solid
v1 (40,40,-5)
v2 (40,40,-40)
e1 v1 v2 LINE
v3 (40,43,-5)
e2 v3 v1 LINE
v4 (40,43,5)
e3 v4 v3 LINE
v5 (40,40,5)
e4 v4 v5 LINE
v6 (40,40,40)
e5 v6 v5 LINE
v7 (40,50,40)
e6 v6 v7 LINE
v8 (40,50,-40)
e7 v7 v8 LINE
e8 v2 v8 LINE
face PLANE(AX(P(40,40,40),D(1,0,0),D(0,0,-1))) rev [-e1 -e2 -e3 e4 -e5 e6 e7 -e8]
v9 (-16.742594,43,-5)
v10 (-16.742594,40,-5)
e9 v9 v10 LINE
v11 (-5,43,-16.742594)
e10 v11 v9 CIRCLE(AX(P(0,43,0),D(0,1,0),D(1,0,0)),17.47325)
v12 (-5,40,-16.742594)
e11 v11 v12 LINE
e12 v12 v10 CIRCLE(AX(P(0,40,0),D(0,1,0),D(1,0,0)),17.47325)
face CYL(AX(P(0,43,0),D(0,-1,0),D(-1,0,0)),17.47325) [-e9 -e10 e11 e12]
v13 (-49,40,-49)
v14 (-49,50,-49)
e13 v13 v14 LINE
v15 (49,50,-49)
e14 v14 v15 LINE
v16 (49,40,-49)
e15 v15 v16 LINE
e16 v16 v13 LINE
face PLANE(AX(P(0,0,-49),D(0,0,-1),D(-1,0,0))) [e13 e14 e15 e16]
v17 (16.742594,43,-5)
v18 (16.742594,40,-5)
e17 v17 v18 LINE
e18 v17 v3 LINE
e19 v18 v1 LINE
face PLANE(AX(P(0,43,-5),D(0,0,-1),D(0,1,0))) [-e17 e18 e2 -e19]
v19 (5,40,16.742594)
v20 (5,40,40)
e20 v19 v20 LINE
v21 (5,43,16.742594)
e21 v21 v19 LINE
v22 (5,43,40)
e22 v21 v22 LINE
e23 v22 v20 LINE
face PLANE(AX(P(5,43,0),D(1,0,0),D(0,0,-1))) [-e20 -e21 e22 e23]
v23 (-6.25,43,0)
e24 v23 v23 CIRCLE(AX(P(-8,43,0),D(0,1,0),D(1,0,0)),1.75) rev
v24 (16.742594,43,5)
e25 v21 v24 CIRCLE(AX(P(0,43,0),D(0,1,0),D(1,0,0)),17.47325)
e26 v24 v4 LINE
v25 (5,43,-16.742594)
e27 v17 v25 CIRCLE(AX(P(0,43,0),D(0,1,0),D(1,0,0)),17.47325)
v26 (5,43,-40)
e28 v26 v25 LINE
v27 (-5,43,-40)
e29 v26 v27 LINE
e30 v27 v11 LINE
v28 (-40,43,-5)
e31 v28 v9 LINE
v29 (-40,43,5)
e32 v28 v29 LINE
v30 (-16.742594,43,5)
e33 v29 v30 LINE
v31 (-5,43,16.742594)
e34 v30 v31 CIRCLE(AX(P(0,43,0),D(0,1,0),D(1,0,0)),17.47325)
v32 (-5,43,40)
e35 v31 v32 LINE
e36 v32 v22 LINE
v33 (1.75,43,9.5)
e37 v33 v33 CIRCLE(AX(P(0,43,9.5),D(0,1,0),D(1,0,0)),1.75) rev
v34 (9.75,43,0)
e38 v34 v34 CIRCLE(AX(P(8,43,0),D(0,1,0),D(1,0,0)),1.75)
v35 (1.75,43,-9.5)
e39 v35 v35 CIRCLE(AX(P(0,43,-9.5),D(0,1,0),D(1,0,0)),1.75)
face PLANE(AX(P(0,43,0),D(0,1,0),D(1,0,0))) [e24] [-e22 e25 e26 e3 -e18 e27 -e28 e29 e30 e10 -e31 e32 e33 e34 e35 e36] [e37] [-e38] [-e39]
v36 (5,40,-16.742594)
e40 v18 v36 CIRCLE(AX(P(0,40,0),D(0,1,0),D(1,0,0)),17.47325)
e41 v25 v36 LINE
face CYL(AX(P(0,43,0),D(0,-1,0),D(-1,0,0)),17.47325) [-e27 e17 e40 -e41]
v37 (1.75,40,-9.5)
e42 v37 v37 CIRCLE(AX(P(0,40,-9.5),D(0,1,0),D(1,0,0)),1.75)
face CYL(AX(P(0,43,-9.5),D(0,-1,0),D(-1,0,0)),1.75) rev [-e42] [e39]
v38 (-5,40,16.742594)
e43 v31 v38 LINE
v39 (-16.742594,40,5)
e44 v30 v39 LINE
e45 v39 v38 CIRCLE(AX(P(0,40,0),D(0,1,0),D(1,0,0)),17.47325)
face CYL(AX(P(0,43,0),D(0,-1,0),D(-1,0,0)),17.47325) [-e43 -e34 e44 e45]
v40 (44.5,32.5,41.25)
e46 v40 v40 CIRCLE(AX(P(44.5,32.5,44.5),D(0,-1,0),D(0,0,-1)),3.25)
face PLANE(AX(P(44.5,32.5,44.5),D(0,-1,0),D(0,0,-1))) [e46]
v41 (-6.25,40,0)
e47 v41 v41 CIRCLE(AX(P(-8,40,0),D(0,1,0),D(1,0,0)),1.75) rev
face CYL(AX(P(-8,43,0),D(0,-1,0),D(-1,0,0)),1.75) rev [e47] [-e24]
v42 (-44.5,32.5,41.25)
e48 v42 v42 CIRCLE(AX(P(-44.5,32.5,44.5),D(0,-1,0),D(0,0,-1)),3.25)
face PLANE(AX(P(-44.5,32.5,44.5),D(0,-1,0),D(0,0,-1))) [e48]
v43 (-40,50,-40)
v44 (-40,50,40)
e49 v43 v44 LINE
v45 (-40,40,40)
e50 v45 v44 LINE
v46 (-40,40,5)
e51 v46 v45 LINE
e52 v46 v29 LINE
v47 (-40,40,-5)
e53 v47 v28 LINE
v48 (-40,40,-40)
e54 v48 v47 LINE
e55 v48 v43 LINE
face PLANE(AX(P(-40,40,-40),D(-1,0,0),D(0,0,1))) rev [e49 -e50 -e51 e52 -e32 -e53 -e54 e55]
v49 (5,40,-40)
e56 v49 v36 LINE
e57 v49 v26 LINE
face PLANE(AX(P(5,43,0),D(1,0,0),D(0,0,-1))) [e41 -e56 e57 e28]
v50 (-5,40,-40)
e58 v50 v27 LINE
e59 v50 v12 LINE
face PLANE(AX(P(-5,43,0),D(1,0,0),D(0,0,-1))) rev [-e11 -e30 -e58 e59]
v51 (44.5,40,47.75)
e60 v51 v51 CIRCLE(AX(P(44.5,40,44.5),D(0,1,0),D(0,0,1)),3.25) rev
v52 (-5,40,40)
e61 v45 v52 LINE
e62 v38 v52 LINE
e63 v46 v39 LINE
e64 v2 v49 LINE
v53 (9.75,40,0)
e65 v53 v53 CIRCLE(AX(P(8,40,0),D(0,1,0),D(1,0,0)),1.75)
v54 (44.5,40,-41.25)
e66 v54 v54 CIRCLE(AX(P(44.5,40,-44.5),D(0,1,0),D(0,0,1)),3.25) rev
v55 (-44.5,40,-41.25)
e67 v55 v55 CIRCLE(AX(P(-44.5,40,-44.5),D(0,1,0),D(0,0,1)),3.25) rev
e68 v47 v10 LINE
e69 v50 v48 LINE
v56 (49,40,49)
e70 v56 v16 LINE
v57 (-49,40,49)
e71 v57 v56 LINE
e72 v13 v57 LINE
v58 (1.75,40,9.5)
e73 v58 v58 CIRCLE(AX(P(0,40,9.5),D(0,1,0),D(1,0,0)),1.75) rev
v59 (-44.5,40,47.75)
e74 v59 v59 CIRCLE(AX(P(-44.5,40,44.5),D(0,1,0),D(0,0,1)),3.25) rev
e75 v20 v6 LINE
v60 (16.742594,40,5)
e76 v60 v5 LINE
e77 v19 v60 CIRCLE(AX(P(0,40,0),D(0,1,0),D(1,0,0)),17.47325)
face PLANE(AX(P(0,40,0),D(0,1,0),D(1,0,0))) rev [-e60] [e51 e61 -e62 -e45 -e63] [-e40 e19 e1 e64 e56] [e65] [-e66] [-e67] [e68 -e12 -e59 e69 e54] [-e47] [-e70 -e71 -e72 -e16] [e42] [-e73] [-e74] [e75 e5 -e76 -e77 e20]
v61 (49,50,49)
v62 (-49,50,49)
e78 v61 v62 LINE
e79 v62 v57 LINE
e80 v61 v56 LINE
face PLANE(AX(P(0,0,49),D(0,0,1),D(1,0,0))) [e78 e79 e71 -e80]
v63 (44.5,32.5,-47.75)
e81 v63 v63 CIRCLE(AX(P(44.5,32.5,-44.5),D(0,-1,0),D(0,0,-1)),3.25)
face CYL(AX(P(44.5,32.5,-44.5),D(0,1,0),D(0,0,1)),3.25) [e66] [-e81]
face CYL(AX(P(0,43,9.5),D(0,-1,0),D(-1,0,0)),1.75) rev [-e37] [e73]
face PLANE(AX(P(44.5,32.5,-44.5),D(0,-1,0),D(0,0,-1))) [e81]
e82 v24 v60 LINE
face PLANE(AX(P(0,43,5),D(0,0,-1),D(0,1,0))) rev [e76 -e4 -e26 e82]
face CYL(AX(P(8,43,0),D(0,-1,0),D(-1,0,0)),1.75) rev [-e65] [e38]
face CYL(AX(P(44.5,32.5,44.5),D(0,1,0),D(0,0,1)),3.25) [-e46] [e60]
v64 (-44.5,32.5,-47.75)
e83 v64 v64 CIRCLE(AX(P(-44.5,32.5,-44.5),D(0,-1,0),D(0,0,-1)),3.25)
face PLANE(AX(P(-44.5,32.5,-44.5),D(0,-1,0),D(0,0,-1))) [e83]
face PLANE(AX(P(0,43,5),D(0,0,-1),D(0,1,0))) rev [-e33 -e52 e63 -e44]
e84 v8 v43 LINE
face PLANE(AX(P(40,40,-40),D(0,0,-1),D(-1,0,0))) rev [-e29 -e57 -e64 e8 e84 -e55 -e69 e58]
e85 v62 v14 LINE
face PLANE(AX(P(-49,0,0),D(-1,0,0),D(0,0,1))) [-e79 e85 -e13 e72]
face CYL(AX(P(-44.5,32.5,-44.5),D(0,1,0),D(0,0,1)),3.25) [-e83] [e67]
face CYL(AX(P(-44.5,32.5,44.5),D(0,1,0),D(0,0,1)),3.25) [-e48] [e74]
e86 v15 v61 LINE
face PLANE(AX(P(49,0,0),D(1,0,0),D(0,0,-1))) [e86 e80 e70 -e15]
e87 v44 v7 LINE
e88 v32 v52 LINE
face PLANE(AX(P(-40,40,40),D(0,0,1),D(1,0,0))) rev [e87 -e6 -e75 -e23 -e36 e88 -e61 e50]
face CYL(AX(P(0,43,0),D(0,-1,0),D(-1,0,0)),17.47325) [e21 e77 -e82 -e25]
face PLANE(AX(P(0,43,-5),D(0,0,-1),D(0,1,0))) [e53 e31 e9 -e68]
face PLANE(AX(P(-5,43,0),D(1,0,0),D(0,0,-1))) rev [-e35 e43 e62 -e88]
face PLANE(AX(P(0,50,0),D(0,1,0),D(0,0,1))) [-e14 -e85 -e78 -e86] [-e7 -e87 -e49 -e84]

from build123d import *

# Parameters (mm, degrees)
SKETCH2_R                  = 1.75
SKETCH2_W                  = 10
SKETCH2_H                  = 10
BOSS_EXTRUDE1_DEPTH        = 3
CIRPATTERN1_COUNT          = 4
CIRPATTERN2_START          = 40
CIRPATTERN2_OUTLINE_R      = 1.75
CIRPATTERN2_DEPTH          = 3
CIRPATTERN2_START_2        = -43
CIRPATTERN2_2_OUTLINE_R    = 1.75
CIRPATTERN2_2_DEPTH        = 3
CIRPATTERN2_3_OUTLINE_R    = 1.75
CIRPATTERN2_3_DEPTH        = 3
CIRPATTERN2_4_OUTLINE_R    = 1.75
CIRPATTERN2_4_DEPTH        = 3
BOSS_EXTRUDE2_DEPTH        = 50
BOSS_EXTRUDE2_DEPTH_BACK   = 50
SKETCH3_W                  = 10
SKETCH3_H                  = 10
BOSS_EXTRUDE2_2_DEPTH      = 50
BOSS_EXTRUDE2_2_DEPTH_BACK = 50
BOSS_EXTRUDE2_3_DEPTH      = 50
BOSS_EXTRUDE2_3_DEPTH_BACK = 50
BOSS_EXTRUDE2_4_DEPTH      = 50
BOSS_EXTRUDE2_4_DEPTH_BACK = 50
SKETCH4_W                  = 100
SKETCH4_H                  = 100
SKETCH4_W_2                = 80
SKETCH4_H_2                = 80
BOSS_EXTRUDE3_DEPTH        = 10
SKETCH5_W                  = 100
SKETCH5_H                  = 100
SKETCH5_W_2                = 80
SKETCH5_H_2                = 80
BOSS_EXTRUDE4_DEPTH        = 10
SKETCH7_R                  = 3.75
CUT_EXTRUDE2_DEPTH         = 10
SKETCH8_R                  = 3.75
CUT_EXTRUDE3_DEPTH         = 117.828934772
SKETCH9_R                  = 3.75
CUT_EXTRUDE4_DEPTH         = 117.828934772
SKETCH10_W                 = 100
SKETCH10_H                 = 100
CUT_EXTRUDE5_DEPTH         = 3
SKETCH11_W                 = 100
SKETCH11_H                 = 97
CUT_EXTRUDE6_DEPTH         = 1
SKETCH12_W                 = 99
SKETCH12_H                 = 97
CUT_EXTRUDE7_DEPTH         = 1
SKETCH13_W                 = 99
SKETCH13_H                 = 97
CUT_EXTRUDE8_DEPTH         = 1
SKETCH14_W                 = 98
SKETCH14_H                 = 97
CUT_EXTRUDE9_DEPTH         = 1
SKETCH16_W                 = 98
SKETCH16_H                 = 98
CUT_EXTRUDE10_DEPTH        = 112.22499719
SKETCH17_R                 = 3.25
BOSS_EXTRUDE5_DEPTH        = 7.5


# Read off the part's stored shape, not the designer's step: CirPattern2
with BuildPart() as part:
    # Sketch2 → Boss-Extrude1 (new body)
    # profile 1 of 13: a face of its own
    with BuildSketch(Plane.XY.offset(40)):
        with BuildLine():
            ThreePointArc((5, -16.74259435), (0, -17.47325), (-5, -16.74259435))
            Line((-5, -16.74259435), (-5, -50))
            Line((-5, -50), (5, -50))
            Line((5, -50), (5, -16.74259435))
        make_face()
    # profile 2 of 13: a face of its own
    with BuildSketch(Plane.XY.offset(40)):
        with BuildLine():
            Line((5, -5), (-5, -5))
            Line((-5, -5), (-5, -16.74259435))
            ThreePointArc((-5, -16.74259435), (0, -17.47325), (5, -16.74259435))
            Line((5, -16.74259435), (5, -5))
        make_face()
        with Locations((0, -9.5)):
            Circle(SKETCH2_R, mode=Mode.SUBTRACT)
    # profile 3 of 13: a face of its own
    with BuildSketch(Plane.XY.offset(40)):
        with BuildLine():
            Line((16.74259435, -5), (5, -5))
            Line((5, -5), (5, -16.74259435))
            ThreePointArc((5, -16.74259435), (12.355453564, -12.355453564), (16.74259435, -5))
        make_face()
    # profile 4 of 13: a face of its own
    with BuildSketch(Plane.XY.offset(40)):
        with BuildLine():
            Line((5, 5), (5, -5))
            Line((5, -5), (16.74259435, -5))
            ThreePointArc((16.74259435, -5), (17.289621197, -2.526551883), (17.47325, 0))
            ThreePointArc((17.47325, 0), (17.289621197, 2.526551883), (16.74259435, 5))
            Line((16.74259435, 5), (5, 5))
        make_face()
        with Locations((8, 0)):
            Circle(SKETCH2_R, mode=Mode.SUBTRACT)
    # profile 5 of 13: a face of its own
    with BuildSketch(Plane.XY.offset(40)):
        Rectangle(SKETCH2_W, SKETCH2_H)
    # profile 6 of 13: a face of its own
    with BuildSketch(Plane.XY.offset(40)):
        with BuildLine():
            Line((-5, -5), (-16.74259435, -5))
            ThreePointArc((-16.74259435, -5), (-12.355453564, -12.355453564), (-5, -16.74259435))
            Line((-5, -16.74259435), (-5, -5))
        make_face()
    # profile 7 of 13: a face of its own
    with BuildSketch(Plane.XY.offset(40)):
        with BuildLine():
            ThreePointArc((-16.74259435, 5), (-17.47325, 0), (-16.74259435, -5))
            Line((-16.74259435, -5), (-5, -5))
            Line((-5, -5), (-5, 5))
            Line((-5, 5), (-16.74259435, 5))
        make_face()
        with Locations((-8, 0)):
            Circle(SKETCH2_R, mode=Mode.SUBTRACT)
    # profile 8 of 13: a face of its own
    with BuildSketch(Plane.XY.offset(40)):
        with BuildLine():
            ThreePointArc((-5, 16.74259435), (-12.355453564, 12.355453564), (-16.74259435, 5))
            Line((-16.74259435, 5), (-5, 5))
            Line((-5, 5), (-5, 16.74259435))
        make_face()
    # profile 9 of 13: a face of its own
    with BuildSketch(Plane.XY.offset(40)):
        with BuildLine():
            Line((-5, 16.74259435), (-5, 5))
            Line((-5, 5), (5, 5))
            Line((5, 5), (5, 16.74259435))
            ThreePointArc((5, 16.74259435), (0, 17.47325), (-5, 16.74259435))
        make_face()
        with Locations((0, 9.5)):
            Circle(SKETCH2_R, mode=Mode.SUBTRACT)
    # profile 10 of 13: a face of its own
    with BuildSketch(Plane.XY.offset(40)):
        with BuildLine():
            Line((5, 16.74259435), (5, 5))
            Line((5, 5), (16.74259435, 5))
            ThreePointArc((16.74259435, 5), (12.355453564, 12.355453564), (5, 16.74259435))
        make_face()
    # profile 11 of 13: a face of its own
    with BuildSketch(Plane.XY.offset(40)):
        with BuildLine():
            ThreePointArc((17.47325, 0), (17.289621197, -2.526551883), (16.74259435, -5))
            Line((16.74259435, -5), (50, -5))
            Line((50, -5), (50, 5))
            Line((50, 5), (16.74259435, 5))
            ThreePointArc((16.74259435, 5), (17.289621197, 2.526551883), (17.47325, 0))
        make_face()
    # profile 12 of 13: a face of its own
    with BuildSketch(Plane.XY.offset(40)):
        with BuildLine():
            Line((-50, 5), (-50, -5))
            Line((-50, -5), (-16.74259435, -5))
            ThreePointArc((-16.74259435, -5), (-17.47325, 0), (-16.74259435, 5))
            Line((-16.74259435, 5), (-50, 5))
        make_face()
    # profile 13 of 13: a face of its own
    with BuildSketch(Plane.XY.offset(40)):
        with BuildLine():
            Line((-5, 50), (-5, 16.74259435))
            ThreePointArc((-5, 16.74259435), (0, 17.47325), (5, 16.74259435))
            Line((5, 16.74259435), (5, 50))
            Line((5, 50), (-5, 50))
        make_face()
    extrude(amount=BOSS_EXTRUDE1_DEPTH)


with BuildPart() as cirpattern1_1:
    # CirPattern1: pattern copy
    add(part.part.rotate(Axis((0, 0, 0), (1, 0, 0)), 1 * 360 / CIRPATTERN1_COUNT))


with BuildPart() as cirpattern1_2:
    # CirPattern1: pattern copy
    add(part.part.rotate(Axis((0, 0, 0), (1, 0, 0)), 2 * 360 / CIRPATTERN1_COUNT))


with BuildPart() as cirpattern1_3:
    # CirPattern1: pattern copy
    add(part.part.rotate(Axis((0, 0, 0), (1, 0, 0)), 3 * 360 / CIRPATTERN1_COUNT))


with BuildPart() as body_5:
    # CirPattern2 outline → CirPattern2 (new body)
    with BuildSketch(Plane.XY.offset(CIRPATTERN2_START)):
        with BuildLine():
            ThreePointArc((5, -16.74259435), (12.355453564, -12.355453564), (16.74259435, -5))
            Line((16.74259435, -5), (50, -5))
            Line((50, -5), (50, 5))
            Line((50, 5), (16.74259435, 5))
            ThreePointArc((16.74259435, 5), (12.355453564, 12.355453564), (5, 16.74259435))
            Line((5, 16.74259435), (5, 50))
            Line((5, 50), (-5, 50))
            Line((-5, 50), (-5, 16.74259435))
            ThreePointArc((-5, 16.74259435), (-12.355453564, 12.355453564), (-16.74259435, 5))
            Line((-16.74259435, 5), (-50, 5))
            Line((-50, 5), (-50, -5))
            Line((-50, -5), (-16.74259435, -5))
            ThreePointArc((-16.74259435, -5), (-12.355453564, -12.355453564), (-5, -16.74259435))
            Line((-5, -16.74259435), (-5, -50))
            Line((-5, -50), (5, -50))
            Line((5, -50), (5, -16.74259435))
        make_face()
        with Locations((0, -9.5)):
            Circle(CIRPATTERN2_OUTLINE_R, mode=Mode.SUBTRACT)
        with Locations((-8, 0)):
            Circle(CIRPATTERN2_OUTLINE_R, mode=Mode.SUBTRACT)
        with Locations((8, 0)):
            Circle(CIRPATTERN2_OUTLINE_R, mode=Mode.SUBTRACT)
        with Locations((0, 9.5)):
            Circle(CIRPATTERN2_OUTLINE_R, mode=Mode.SUBTRACT)
    extrude(amount=CIRPATTERN2_DEPTH)


with BuildPart() as body_6:
    # CirPattern2 2 outline → CirPattern2 2 (new body)
    with BuildSketch(Plane.YZ.offset(CIRPATTERN2_START_2)):
        with BuildLine():
            Line((-5, 50), (-5, 16.74259435))
            ThreePointArc((-5, 16.74259435), (-12.355453564, 12.355453564), (-16.74259435, 5))
            Line((-16.74259435, 5), (-50, 5))
            Line((-50, 5), (-50, -5))
            Line((-50, -5), (-16.74259435, -5))
            ThreePointArc((-16.74259435, -5), (-12.355453564, -12.355453564), (-5, -16.74259435))
            Line((-5, -16.74259435), (-5, -50))
            Line((-5, -50), (5, -50))
            Line((5, -50), (5, -16.74259435))
            ThreePointArc((5, -16.74259435), (12.355453564, -12.355453564), (16.74259435, -5))
            Line((16.74259435, -5), (50, -5))
            Line((50, -5), (50, 5))
            Line((50, 5), (16.74259435, 5))
            ThreePointArc((16.74259435, 5), (12.355453564, 12.355453564), (5, 16.74259435))
            Line((5, 16.74259435), (5, 50))
            Line((5, 50), (-5, 50))
        make_face()
        with Locations((0, -8)):
            Circle(CIRPATTERN2_2_OUTLINE_R, mode=Mode.SUBTRACT)
        with Locations((-9.5, 0)):
            Circle(CIRPATTERN2_2_OUTLINE_R, mode=Mode.SUBTRACT)
        with Locations((9.5, 0)):
            Circle(CIRPATTERN2_2_OUTLINE_R, mode=Mode.SUBTRACT)
        with Locations((0, 8)):
            Circle(CIRPATTERN2_2_OUTLINE_R, mode=Mode.SUBTRACT)
    extrude(amount=CIRPATTERN2_2_DEPTH)


with BuildPart() as body_7:
    # CirPattern2 3 outline → CirPattern2 3 (new body)
    with BuildSketch(Plane.YZ.offset(CIRPATTERN2_START)):
        with BuildLine():
            ThreePointArc((-16.74259435, -5), (-12.355453564, -12.355453564), (-5, -16.74259435))
            Line((-5, -16.74259435), (-5, -50))
            Line((-5, -50), (5, -50))
            Line((5, -50), (5, -16.74259435))
            ThreePointArc((5, -16.74259435), (12.355453564, -12.355453564), (16.74259435, -5))
            Line((16.74259435, -5), (50, -5))
            Line((50, -5), (50, 5))
            Line((50, 5), (16.74259435, 5))
            ThreePointArc((16.74259435, 5), (12.355453564, 12.355453564), (5, 16.74259435))
            Line((5, 16.74259435), (5, 50))
            Line((5, 50), (-5, 50))
            Line((-5, 50), (-5, 16.74259435))
            ThreePointArc((-5, 16.74259435), (-12.355453564, 12.355453564), (-16.74259435, 5))
            Line((-16.74259435, 5), (-50, 5))
            Line((-50, 5), (-50, -5))
            Line((-50, -5), (-16.74259435, -5))
        make_face()
        with Locations((0, -8)):
            Circle(CIRPATTERN2_3_OUTLINE_R, mode=Mode.SUBTRACT)
        with Locations((-9.5, 0)):
            Circle(CIRPATTERN2_3_OUTLINE_R, mode=Mode.SUBTRACT)
        with Locations((9.5, 0)):
            Circle(CIRPATTERN2_3_OUTLINE_R, mode=Mode.SUBTRACT)
        with Locations((0, 8)):
            Circle(CIRPATTERN2_3_OUTLINE_R, mode=Mode.SUBTRACT)
    extrude(amount=CIRPATTERN2_3_DEPTH)


with BuildPart() as body_8:
    # CirPattern2 4 outline → CirPattern2 4 (new body)
    with BuildSketch(Plane.XY.offset(CIRPATTERN2_START_2)):
        with BuildLine():
            Line((50, 5), (16.74259435, 5))
            ThreePointArc((16.74259435, 5), (12.355453564, 12.355453564), (5, 16.74259435))
            Line((5, 16.74259435), (5, 50))
            Line((5, 50), (-5, 50))
            Line((-5, 50), (-5, 16.74259435))
            ThreePointArc((-5, 16.74259435), (-12.355453564, 12.355453564), (-16.74259435, 5))
            Line((-16.74259435, 5), (-50, 5))
            Line((-50, 5), (-50, -5))
            Line((-50, -5), (-16.74259435, -5))
            ThreePointArc((-16.74259435, -5), (-12.355453564, -12.355453564), (-5, -16.74259435))
            Line((-5, -16.74259435), (-5, -50))
            Line((-5, -50), (5, -50))
            Line((5, -50), (5, -16.74259435))
            ThreePointArc((5, -16.74259435), (12.355453564, -12.355453564), (16.74259435, -5))
            Line((16.74259435, -5), (50, -5))
            Line((50, -5), (50, 5))
        make_face()
        with Locations((0, -9.5)):
            Circle(CIRPATTERN2_4_OUTLINE_R, mode=Mode.SUBTRACT)
        with Locations((-8, 0)):
            Circle(CIRPATTERN2_4_OUTLINE_R, mode=Mode.SUBTRACT)
        with Locations((8, 0)):
            Circle(CIRPATTERN2_4_OUTLINE_R, mode=Mode.SUBTRACT)
        with Locations((0, 9.5)):
            Circle(CIRPATTERN2_4_OUTLINE_R, mode=Mode.SUBTRACT)
    extrude(amount=CIRPATTERN2_4_DEPTH)


with BuildPart() as body_9:
    # Sketch3 → Boss-Extrude2 (new, two sides: drawn at the far end of the back side and taken through both)
    with BuildSketch(Plane(origin=(0, 0, 0), x_dir=(1, 0, 0), z_dir=(0, 1, 0)).offset(-BOSS_EXTRUDE2_DEPTH_BACK)):
        with Locations((-45, -45)):
            Rectangle(SKETCH3_W, SKETCH3_H)
    extrude(amount=BOSS_EXTRUDE2_DEPTH + BOSS_EXTRUDE2_DEPTH_BACK)


with BuildPart() as body_10:
    # Sketch3 → Boss-Extrude2 2 (new, two sides: drawn at the far end of the back side and taken through both)
    with BuildSketch(Plane(origin=(0, 0, 0), x_dir=(1, 0, 0), z_dir=(0, 1, 0)).offset(-BOSS_EXTRUDE2_2_DEPTH_BACK)):
        with Locations((45, -45)):
            Rectangle(SKETCH3_W, SKETCH3_H)
    extrude(amount=BOSS_EXTRUDE2_2_DEPTH + BOSS_EXTRUDE2_2_DEPTH_BACK)


with BuildPart() as body_11:
    # Sketch3 → Boss-Extrude2 3 (new, two sides: drawn at the far end of the back side and taken through both)
    with BuildSketch(Plane(origin=(0, 0, 0), x_dir=(1, 0, 0), z_dir=(0, 1, 0)).offset(-BOSS_EXTRUDE2_3_DEPTH_BACK)):
        with Locations((45, 45)):
            Rectangle(SKETCH3_W, SKETCH3_H)
    extrude(amount=BOSS_EXTRUDE2_3_DEPTH + BOSS_EXTRUDE2_3_DEPTH_BACK)


with BuildPart() as body_12:
    # Sketch3 → Boss-Extrude2 4 (new, two sides: drawn at the far end of the back side and taken through both)
    with BuildSketch(Plane(origin=(0, 0, 0), x_dir=(1, 0, 0), z_dir=(0, 1, 0)).offset(-BOSS_EXTRUDE2_4_DEPTH_BACK)):
        with Locations((-45, 45)):
            Rectangle(SKETCH3_W, SKETCH3_H)
    extrude(amount=BOSS_EXTRUDE2_4_DEPTH + BOSS_EXTRUDE2_4_DEPTH_BACK)


with BuildPart() as part_1:
    add(part.part)

    add(cirpattern1_1.part)  # Boss-Extrude3 merges CirPattern1_1

    add(cirpattern1_2.part)  # Boss-Extrude3 merges CirPattern1_2

    add(body_5.part)  # Boss-Extrude3 merges body 5

    add(body_6.part)  # Boss-Extrude3 merges body 6

    add(body_7.part)  # Boss-Extrude3 merges body 7

    add(body_8.part)  # Boss-Extrude3 merges body 8

    add(body_9.part)  # Boss-Extrude3 merges body 9

    add(body_10.part)  # Boss-Extrude3 merges body 10

    add(body_11.part)  # Boss-Extrude3 merges body 11

    add(body_12.part)  # Boss-Extrude3 merges body 12
    # Sketch4 → Boss-Extrude3 (add)
    with BuildSketch(Plane.XZ.offset(50)):
        Rectangle(SKETCH4_W, SKETCH4_H)
        Rectangle(SKETCH4_W_2, SKETCH4_H_2, mode=Mode.SUBTRACT)
    extrude(amount=-BOSS_EXTRUDE3_DEPTH)

    add(cirpattern1_3.part)  # Boss-Extrude4 merges CirPattern1_3
    # Sketch5 → Boss-Extrude4 (add)
    with BuildSketch(Plane(origin=(0, 50, 0), x_dir=(1, 0, 0), z_dir=(0, 1, 0))):
        Rectangle(SKETCH5_W, SKETCH5_H)
        Rectangle(SKETCH5_W_2, SKETCH5_H_2, mode=Mode.SUBTRACT)
    extrude(amount=-BOSS_EXTRUDE4_DEPTH)

    # Sketch7 → Cut-Extrude2 (cut)
    with BuildSketch(Plane.XZ.offset(43)):
        with Locations(Location((0, 0, 0), (0, 0, 270))):
            Circle(SKETCH7_R)
    extrude(amount=-CUT_EXTRUDE2_DEPTH, mode=Mode.SUBTRACT)

    # Sketch8 → Cut-Extrude3 (cut, through all)
    with BuildSketch(Plane.ZY.offset(43)):
        Circle(SKETCH8_R)
    extrude(amount=-CUT_EXTRUDE3_DEPTH, mode=Mode.SUBTRACT)

    # Sketch9 → Cut-Extrude4 (cut, through all)
    with BuildSketch(Plane(origin=(0, 0, -43), x_dir=(-1, 0, 0), z_dir=(0, 0, -1))):
        Circle(SKETCH9_R)
    extrude(amount=-CUT_EXTRUDE4_DEPTH, mode=Mode.SUBTRACT)

    # Sketch10 → Cut-Extrude5 (cut)
    with BuildSketch(Plane.XZ.offset(50)):
        Rectangle(SKETCH10_W, SKETCH10_H)
    extrude(amount=-CUT_EXTRUDE5_DEPTH, mode=Mode.SUBTRACT)

    # Sketch11 → Cut-Extrude6 (cut)
    with BuildSketch(Plane.ZY.offset(50)):
        with Locations((0, 1.5)):
            Rectangle(SKETCH11_W, SKETCH11_H)
    extrude(amount=-CUT_EXTRUDE6_DEPTH, mode=Mode.SUBTRACT)

    # Sketch12 → Cut-Extrude7 (cut)
    with BuildSketch(Plane.XY.offset(50)):
        with Locations((0.5, 1.5)):
            Rectangle(SKETCH12_W, SKETCH12_H)
    extrude(amount=-CUT_EXTRUDE7_DEPTH, mode=Mode.SUBTRACT)

    # Sketch13 → Cut-Extrude8 (cut)
    with BuildSketch(Plane(origin=(50, 0, 0), x_dir=(0, 0, -1), z_dir=(1, 0, 0))):
        with Locations((0.5, 1.5)):
            Rectangle(SKETCH13_W, SKETCH13_H)
    extrude(amount=-CUT_EXTRUDE8_DEPTH, mode=Mode.SUBTRACT)

    # Sketch14 → Cut-Extrude9 (cut)
    with BuildSketch(Plane(origin=(0, 0, -50), x_dir=(-1, 0, 0), z_dir=(0, 0, -1))):
        with Locations((0, 1.5)):
            Rectangle(SKETCH14_W, SKETCH14_H)
    extrude(amount=-CUT_EXTRUDE9_DEPTH, mode=Mode.SUBTRACT)

    # Sketch16 → Cut-Extrude10 (cut, through all)
    with BuildSketch(Plane.XZ.offset(-40)):
        Rectangle(SKETCH16_W, SKETCH16_H)
    extrude(amount=CUT_EXTRUDE10_DEPTH, mode=Mode.SUBTRACT)

    # Sketch17 → Boss-Extrude5 (add)
    with BuildSketch(Plane.XZ.offset(-40)):
        with Locations(Location((44.5, -44.5, 0), (0, 0, 90))):
            Circle(SKETCH17_R)
        with Locations(Location((-44.5, -44.5, 0), (0, 0, 90))):
            Circle(SKETCH17_R)
        with Locations(Location((-44.5, 44.5, 0), (0, 0, 90))):
            Circle(SKETCH17_R)
        with Locations(Location((44.5, 44.5, 0), (0, 0, 90))):
            Circle(SKETCH17_R)
    extrude(amount=BOSS_EXTRUDE5_DEPTH)


solid = part_1.part
